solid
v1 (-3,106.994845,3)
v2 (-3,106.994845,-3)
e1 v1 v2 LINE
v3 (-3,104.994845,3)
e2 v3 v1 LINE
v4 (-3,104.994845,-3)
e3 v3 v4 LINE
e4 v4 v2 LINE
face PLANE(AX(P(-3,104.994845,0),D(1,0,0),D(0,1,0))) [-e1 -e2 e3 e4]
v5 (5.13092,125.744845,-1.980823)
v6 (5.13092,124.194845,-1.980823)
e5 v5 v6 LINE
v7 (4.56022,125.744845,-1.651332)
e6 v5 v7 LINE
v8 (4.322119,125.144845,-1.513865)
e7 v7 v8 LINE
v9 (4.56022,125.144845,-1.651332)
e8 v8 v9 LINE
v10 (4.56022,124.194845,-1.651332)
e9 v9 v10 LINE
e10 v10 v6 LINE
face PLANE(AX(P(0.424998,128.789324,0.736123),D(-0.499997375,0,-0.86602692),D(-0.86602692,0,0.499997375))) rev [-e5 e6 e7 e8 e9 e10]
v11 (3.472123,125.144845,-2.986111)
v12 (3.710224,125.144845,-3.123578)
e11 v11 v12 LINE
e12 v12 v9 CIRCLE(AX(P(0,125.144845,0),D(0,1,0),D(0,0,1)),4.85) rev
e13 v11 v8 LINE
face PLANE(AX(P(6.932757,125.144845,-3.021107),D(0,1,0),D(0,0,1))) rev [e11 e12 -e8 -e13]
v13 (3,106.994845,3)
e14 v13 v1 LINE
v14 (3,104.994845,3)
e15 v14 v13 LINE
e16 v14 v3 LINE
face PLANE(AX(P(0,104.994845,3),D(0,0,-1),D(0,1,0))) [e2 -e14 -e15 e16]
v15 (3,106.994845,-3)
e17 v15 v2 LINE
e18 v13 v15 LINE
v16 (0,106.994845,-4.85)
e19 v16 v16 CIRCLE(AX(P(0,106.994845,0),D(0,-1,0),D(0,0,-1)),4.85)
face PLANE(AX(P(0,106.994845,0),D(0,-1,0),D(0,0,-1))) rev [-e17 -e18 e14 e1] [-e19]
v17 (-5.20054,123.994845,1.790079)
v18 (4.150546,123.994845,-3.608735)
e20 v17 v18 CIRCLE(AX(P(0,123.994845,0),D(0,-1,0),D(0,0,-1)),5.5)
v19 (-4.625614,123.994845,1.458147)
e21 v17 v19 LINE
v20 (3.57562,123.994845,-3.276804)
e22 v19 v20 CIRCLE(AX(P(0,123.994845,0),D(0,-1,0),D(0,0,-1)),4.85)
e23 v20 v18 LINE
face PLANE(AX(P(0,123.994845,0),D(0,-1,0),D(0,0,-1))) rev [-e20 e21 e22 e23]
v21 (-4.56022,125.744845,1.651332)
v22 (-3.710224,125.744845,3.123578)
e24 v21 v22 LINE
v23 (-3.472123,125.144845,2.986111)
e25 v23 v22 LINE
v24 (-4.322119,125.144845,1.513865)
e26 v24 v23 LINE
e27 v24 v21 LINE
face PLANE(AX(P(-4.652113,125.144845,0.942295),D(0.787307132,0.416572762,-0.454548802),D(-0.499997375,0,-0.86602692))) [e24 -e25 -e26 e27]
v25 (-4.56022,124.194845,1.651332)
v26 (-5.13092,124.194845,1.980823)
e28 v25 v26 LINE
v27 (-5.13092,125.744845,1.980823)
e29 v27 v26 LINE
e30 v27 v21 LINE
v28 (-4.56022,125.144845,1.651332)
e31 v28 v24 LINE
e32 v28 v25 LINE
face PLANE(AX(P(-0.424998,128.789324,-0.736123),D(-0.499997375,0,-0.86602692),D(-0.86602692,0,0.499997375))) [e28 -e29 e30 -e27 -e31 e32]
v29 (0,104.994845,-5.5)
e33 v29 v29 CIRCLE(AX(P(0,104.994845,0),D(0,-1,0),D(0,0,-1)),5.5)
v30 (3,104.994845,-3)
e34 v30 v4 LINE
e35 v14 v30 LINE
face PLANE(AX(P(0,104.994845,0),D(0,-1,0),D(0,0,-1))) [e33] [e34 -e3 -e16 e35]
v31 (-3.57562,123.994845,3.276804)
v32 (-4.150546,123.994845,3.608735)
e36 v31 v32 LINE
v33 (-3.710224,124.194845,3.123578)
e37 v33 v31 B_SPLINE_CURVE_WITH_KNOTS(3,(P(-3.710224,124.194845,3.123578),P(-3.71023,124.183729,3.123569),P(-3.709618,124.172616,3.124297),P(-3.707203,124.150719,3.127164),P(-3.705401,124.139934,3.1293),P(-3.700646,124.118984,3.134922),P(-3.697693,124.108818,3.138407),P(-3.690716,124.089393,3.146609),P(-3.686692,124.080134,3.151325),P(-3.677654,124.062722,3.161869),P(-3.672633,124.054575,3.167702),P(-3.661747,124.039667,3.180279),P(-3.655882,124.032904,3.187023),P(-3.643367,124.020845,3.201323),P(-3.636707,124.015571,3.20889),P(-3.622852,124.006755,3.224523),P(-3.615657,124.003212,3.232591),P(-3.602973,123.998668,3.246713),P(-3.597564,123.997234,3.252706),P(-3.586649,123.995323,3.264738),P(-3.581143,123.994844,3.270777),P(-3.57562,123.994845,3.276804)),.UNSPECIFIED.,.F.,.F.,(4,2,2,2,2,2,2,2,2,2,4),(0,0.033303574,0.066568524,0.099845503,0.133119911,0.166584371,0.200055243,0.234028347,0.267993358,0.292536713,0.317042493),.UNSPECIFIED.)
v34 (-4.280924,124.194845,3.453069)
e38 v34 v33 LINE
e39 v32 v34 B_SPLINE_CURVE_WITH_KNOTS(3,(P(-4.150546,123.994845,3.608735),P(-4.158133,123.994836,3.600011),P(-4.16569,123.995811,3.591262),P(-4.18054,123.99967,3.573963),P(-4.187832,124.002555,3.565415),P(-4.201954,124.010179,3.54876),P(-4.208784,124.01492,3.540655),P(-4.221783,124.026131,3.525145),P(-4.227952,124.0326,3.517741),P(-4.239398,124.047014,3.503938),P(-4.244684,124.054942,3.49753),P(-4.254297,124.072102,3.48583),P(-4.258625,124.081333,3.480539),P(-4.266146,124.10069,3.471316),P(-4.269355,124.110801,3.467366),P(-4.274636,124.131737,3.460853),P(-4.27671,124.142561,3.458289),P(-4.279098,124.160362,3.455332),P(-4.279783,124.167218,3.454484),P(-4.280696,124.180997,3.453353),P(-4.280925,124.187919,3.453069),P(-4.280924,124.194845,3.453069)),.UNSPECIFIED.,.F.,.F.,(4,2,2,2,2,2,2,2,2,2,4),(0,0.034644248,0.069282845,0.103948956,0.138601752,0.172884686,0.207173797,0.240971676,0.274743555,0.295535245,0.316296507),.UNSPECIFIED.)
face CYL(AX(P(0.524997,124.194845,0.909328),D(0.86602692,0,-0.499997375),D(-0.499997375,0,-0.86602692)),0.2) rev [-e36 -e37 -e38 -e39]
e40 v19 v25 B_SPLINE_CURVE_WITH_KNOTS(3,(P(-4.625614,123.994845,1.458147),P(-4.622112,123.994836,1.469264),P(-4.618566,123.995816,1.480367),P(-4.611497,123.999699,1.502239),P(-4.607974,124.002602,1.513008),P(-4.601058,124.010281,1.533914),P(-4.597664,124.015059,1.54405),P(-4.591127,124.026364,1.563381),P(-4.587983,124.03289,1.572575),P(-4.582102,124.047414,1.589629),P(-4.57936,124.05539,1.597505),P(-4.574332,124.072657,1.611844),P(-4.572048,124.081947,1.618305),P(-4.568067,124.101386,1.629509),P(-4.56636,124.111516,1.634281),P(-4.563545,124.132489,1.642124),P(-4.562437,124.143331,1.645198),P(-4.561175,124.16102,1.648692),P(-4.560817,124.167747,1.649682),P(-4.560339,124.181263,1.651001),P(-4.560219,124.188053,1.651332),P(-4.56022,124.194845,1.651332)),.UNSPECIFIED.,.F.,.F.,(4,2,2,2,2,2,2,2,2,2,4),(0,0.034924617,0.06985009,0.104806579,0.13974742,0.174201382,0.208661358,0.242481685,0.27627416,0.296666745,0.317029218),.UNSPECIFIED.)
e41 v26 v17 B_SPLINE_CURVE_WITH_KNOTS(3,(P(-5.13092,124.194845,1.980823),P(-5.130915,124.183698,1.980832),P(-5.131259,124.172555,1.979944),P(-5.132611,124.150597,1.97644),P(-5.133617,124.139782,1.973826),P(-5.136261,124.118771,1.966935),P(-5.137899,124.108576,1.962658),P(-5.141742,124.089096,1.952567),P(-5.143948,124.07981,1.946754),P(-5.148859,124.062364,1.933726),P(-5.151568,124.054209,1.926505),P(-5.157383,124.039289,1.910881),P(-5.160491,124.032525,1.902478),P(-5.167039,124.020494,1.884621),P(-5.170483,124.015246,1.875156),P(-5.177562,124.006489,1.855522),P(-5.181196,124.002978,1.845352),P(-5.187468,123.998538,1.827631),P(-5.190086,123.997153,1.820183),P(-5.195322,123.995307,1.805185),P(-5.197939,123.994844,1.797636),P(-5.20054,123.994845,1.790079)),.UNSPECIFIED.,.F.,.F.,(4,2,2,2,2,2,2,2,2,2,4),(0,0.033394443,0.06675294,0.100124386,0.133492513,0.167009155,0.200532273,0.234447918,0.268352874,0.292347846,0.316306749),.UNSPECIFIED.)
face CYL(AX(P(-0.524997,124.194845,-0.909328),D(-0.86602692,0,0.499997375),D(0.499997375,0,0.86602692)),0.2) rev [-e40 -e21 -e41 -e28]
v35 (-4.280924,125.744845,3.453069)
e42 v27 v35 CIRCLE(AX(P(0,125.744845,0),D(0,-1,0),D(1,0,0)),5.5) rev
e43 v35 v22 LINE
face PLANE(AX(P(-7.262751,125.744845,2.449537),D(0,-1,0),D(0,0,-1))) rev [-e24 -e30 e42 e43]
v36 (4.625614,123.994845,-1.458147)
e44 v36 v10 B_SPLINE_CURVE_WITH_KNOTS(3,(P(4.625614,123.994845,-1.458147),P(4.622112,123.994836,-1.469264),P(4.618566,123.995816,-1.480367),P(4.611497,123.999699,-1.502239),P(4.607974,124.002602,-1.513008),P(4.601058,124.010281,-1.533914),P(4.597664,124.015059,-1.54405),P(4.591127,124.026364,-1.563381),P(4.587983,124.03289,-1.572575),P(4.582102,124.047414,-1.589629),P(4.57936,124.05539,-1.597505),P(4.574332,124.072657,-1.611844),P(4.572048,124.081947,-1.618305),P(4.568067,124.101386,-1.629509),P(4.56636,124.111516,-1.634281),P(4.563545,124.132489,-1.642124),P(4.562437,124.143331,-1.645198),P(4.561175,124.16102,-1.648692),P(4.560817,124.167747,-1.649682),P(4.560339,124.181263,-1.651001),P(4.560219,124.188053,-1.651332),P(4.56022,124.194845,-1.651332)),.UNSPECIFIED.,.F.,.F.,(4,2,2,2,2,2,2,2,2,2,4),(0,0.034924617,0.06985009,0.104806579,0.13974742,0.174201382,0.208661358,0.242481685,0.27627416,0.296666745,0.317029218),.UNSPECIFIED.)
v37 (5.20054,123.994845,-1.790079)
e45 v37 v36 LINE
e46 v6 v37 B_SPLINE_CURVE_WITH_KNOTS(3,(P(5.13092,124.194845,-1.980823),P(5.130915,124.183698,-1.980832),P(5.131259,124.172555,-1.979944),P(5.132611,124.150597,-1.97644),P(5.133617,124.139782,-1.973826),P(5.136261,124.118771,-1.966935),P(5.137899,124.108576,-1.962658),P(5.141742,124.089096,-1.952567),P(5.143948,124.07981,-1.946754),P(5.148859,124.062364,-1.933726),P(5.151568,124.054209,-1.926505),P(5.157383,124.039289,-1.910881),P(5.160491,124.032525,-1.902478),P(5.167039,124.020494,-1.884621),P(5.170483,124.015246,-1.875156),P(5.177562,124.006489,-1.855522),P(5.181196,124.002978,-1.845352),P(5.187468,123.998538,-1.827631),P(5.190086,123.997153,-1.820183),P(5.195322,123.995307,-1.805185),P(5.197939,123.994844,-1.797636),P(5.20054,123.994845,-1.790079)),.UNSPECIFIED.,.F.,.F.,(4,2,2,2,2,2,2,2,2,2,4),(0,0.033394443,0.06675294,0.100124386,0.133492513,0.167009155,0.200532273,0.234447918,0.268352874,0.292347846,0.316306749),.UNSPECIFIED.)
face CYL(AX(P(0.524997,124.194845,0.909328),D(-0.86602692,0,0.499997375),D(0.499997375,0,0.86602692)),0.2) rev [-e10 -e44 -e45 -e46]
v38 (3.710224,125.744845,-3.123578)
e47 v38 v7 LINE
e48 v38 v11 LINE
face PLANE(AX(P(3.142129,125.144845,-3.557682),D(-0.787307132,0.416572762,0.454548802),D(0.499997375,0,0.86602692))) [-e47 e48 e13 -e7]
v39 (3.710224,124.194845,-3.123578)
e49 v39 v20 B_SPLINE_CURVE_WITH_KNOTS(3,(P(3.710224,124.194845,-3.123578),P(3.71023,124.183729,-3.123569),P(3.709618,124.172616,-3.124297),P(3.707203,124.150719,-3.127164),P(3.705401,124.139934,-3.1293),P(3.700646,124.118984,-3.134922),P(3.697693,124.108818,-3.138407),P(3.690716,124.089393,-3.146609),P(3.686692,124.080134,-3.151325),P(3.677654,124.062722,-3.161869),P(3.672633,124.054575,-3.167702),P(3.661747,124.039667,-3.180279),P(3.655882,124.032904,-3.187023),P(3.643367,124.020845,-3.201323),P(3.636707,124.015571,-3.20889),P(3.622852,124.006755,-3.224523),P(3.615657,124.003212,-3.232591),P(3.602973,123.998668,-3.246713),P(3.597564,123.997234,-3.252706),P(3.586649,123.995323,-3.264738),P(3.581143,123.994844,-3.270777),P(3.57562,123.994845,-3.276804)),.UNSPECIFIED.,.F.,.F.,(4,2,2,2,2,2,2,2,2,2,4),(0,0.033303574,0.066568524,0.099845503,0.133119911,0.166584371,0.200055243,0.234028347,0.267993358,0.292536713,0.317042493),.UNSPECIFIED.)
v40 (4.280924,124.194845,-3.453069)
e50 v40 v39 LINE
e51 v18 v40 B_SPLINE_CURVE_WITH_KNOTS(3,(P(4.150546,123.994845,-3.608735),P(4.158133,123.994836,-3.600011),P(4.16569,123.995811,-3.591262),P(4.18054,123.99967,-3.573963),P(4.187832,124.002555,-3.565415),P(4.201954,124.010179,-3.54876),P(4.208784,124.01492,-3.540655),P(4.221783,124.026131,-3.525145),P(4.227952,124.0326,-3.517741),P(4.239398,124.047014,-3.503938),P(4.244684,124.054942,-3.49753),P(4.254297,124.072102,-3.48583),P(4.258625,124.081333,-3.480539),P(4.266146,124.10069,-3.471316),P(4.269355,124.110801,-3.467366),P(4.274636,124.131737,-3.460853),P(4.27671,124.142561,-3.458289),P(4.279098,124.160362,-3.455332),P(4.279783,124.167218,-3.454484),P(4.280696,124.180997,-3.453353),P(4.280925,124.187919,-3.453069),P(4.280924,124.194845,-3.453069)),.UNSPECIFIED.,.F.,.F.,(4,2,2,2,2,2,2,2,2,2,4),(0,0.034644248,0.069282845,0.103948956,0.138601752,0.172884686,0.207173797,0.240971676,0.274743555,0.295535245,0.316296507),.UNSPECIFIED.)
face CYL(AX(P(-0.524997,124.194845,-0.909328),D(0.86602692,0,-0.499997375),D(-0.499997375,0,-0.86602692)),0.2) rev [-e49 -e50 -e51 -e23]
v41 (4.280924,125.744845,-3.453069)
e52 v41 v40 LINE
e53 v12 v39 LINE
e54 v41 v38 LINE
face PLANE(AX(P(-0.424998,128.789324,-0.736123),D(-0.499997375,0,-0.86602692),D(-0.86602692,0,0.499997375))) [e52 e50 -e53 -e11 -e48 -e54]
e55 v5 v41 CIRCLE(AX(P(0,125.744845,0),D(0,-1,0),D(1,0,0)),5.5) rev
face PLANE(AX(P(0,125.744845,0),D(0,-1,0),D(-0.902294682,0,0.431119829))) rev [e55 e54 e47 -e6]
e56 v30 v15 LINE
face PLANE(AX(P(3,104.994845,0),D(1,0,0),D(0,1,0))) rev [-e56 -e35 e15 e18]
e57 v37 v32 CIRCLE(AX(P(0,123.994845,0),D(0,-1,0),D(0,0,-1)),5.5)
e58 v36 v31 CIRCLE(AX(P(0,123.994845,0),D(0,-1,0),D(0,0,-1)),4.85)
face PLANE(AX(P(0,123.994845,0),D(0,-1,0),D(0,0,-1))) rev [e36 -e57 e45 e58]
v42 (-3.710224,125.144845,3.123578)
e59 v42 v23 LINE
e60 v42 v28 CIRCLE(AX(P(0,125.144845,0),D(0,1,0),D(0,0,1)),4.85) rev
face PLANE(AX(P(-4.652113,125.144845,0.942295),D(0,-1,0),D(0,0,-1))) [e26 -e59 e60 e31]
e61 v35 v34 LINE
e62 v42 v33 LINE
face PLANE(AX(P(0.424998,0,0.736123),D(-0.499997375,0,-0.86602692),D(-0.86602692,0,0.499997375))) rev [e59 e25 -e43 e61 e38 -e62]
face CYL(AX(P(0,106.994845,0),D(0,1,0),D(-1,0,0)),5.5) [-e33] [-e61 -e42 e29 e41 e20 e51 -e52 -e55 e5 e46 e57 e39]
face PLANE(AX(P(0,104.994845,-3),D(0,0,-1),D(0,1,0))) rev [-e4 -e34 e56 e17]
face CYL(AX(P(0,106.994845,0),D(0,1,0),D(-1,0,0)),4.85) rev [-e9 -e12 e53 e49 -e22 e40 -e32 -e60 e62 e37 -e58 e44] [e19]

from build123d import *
from build123d.topology import SkipClean

# Parameters (mm, degrees)
SKETCH1_R                = 5.5
SKETCH1_R_2              = 4.85
BOSS_EXTRUDE1_DEPTH      = 17
BOSS_EXTRUDE2_START      = -1.75
BOSS_EXTRUDE2_DEPTH      = 1.75
BOSS_EXTRUDE3_DEPTH      = 1.7
BOSS_EXTRUDE3_2_DEPTH    = 1.7
BOSS_EXTRUDE4_REACH      = 128.36
BOSS_EXTRUDE4_END_RADIUS = 4.85
SKETCH3_W                = 1.7
SKETCH3_H                = 0.6
BOSS_EXTRUDE5_START      = -9.624935
SKETCH3_2_W              = 1.7
SKETCH3_2_H              = 0.6
BOSS_EXTRUDE5_DEPTH      = 0.075066
FILLET1_R                = 0.2
BOSS_EXTRUDE6_START      = 17
SKETCH1_4_R              = 5.5
SKETCH1_4_W              = 6
SKETCH1_4_H              = 6
BOSS_EXTRUDE6_DEPTH      = 2


with BuildPart() as part:
    # Sketch1 → Boss-Extrude1 (new body)
    with BuildSketch(Plane.XZ.offset(-123.994845224)):
        with Locations(Location((0, 0, 0), (0, 0, 270))):
            Circle(SKETCH1_R)
        with Locations(Location((0, 0, 0), (0, 0, 270))):
            Circle(SKETCH1_R_2, mode=Mode.SUBTRACT)
    extrude(amount=BOSS_EXTRUDE1_DEPTH)

    # Sketch1<3> → Boss-Extrude2 (add)
    with SkipClean():  # the faces are left unmerged after this step: merging them gives an invalid solid
        with BuildSketch(Plane.XZ.offset(-123.994845224).offset(BOSS_EXTRUDE2_START)):
            with BuildLine():
                ThreePointArc((4.280924301, -3.453069233), (4.763148058, -2.74998556), (5.130919838, -1.98082347))
                Line((5.130919838, -1.98082347), (5.108754465, -1.968026376))
                Line((5.108754465, -1.968026376), (4.625228328, -1.688864385))
                Line((4.625228328, -1.688864385), (4.20023564, -2.424978467))
                Line((4.20023564, -2.424978467), (3.775232792, -3.161110148))
                Line((3.775232792, -3.161110148), (4.258758928, -3.440272139))
                Line((4.258758928, -3.440272139), (4.280924301, -3.453069233))
            make_face()
            with BuildLine():
                Line((-3.775232792, 3.161110148), (-4.258758928, 3.440272139))
                Line((-4.258758928, 3.440272139), (-4.280924301, 3.453069233))
                ThreePointArc((-4.280924301, 3.453069233), (-4.763148058, 2.74998556), (-5.130919838, 1.98082347))
                Line((-5.130919838, 1.98082347), (-5.108754465, 1.968026376))
                Line((-5.108754465, 1.968026376), (-4.625228328, 1.688864385))
                Line((-4.625228328, 1.688864385), (-4.200235262, 2.424979122))
                Line((-4.200235262, 2.424979122), (-3.775232792, 3.161110148))
            make_face()
            with BuildLine():
                Line((4.625228328, -1.688864385), (4.560219632, -1.651331859))
                ThreePointArc((4.560219632, -1.651331859), (4.397274885, -2.046087385), (4.20023564, -2.424978467))
                Line((4.20023564, -2.424978467), (4.625228328, -1.688864385))
            make_face()
            with BuildLine():
                ThreePointArc((4.20023564, -2.424978467), (3.970623818, -2.785075672), (3.710224095, -3.123577623))
                Line((3.710224095, -3.123577623), (3.775232792, -3.161110148))
                Line((3.775232792, -3.161110148), (4.20023564, -2.424978467))
            make_face()
            with BuildLine():
                ThreePointArc((-4.560219632, 1.651331859), (-4.397274725, 2.046087728), (-4.200235262, 2.424979122))
                Line((-4.200235262, 2.424979122), (-4.625228328, 1.688864385))
                Line((-4.625228328, 1.688864385), (-4.560219632, 1.651331859))
            make_face()
            with BuildLine():
                Line((-3.710224095, 3.123577623), (-3.775232792, 3.161110148))
                Line((-3.775232792, 3.161110148), (-4.200235262, 2.424979122))
                ThreePointArc((-4.200235262, 2.424979122), (-3.970623601, 2.785075982), (-3.710224095, 3.123577623))
            make_face()
        extrude(amount=BOSS_EXTRUDE2_DEPTH)



with BuildPart() as body_2:
    # Sketch2 → Boss-Extrude3 (new body)
    with BuildSketch(Plane(origin=(0.424997768, 0, 0.736122882), x_dir=(0.866026919582721, 0, -0.49999737455117027), z_dir=(0.49999737455117027, 0, 0.866026919582721))):
        Polygon((4.5, 125.144845224), (4.774934555, 125.144845224), (4.774934555, 125.744845224), align=None)
    extrude(amount=-BOSS_EXTRUDE3_DEPTH)


with BuildPart() as body_3:
    # Sketch2 → Boss-Extrude3 2 (new body)
    with BuildSketch(Plane(origin=(0.424997768, 0, 0.736122882), x_dir=(0.866026919582721, 0, -0.49999737455117027), z_dir=(0.49999737455117027, 0, 0.866026919582721))):
        Polygon((-4.5, 125.144845224), (-4.774934555, 125.744845224), (-4.774934555, 125.144845224), align=None)
    extrude(amount=-BOSS_EXTRUDE3_2_DEPTH)


with BuildPart() as part_1:
    with SkipClean():  # the faces are left unmerged after this step: merging them gives an invalid solid
        add(part.part)

        add(body_2.part)  # Boss-Extrude4 merges body 2
        # Boss-Extrude4: up to this cylinder (the profile starts inside it)
        boss_extrude4_end = Plane(origin=(0, 125.444845, 0), z_dir=(0, 1, 0)) * Cylinder(BOSS_EXTRUDE4_END_RADIUS, 267.42, mode=Mode.PRIVATE)
        # Sketch3 → Boss-Extrude4 (add, up to the surface)
        with BuildSketch(Plane(origin=(4.135221863, 0, -2.387454741), x_dir=(-0.4999973745511703, 0, -0.866026919582721), z_dir=(0.866026919582721, 0, -0.4999973745511703)), mode=Mode.PRIVATE) as boss_extrude4_sk1:
            with Locations((0, 125.444845224)):
                Rectangle(SKETCH3_W, SKETCH3_H)
        boss_extrude4_tool1 = extrude(boss_extrude4_sk1.sketch, amount=BOSS_EXTRUDE4_REACH, mode=Mode.PRIVATE) & boss_extrude4_end
        add(boss_extrude4_tool1.solids().sort_by_distance((4.135222, 125.444845, -2.387455))[0])


    with SkipClean():  # the faces are left unmerged after this step: merging them gives an invalid solid
        add(body_3.part)  # Boss-Extrude5 merges body 3
        # Sketch3<2> → Boss-Extrude5 (add)
        with BuildSketch(Plane(origin=(4.135221863, 0, -2.387454741), x_dir=(-0.4999973745511703, 0, -0.866026919582721), z_dir=(0.866026919582721, 0, -0.4999973745511703)).offset(BOSS_EXTRUDE5_START)):
            with Locations((0, 125.444845224)):
                Rectangle(SKETCH3_2_W, SKETCH3_2_H)
        extrude(amount=BOSS_EXTRUDE5_DEPTH)

    # Fillet1
    # the kernel refuses this fillet: 0.2 mm, written as the material it adds along each edge
    with BuildSketch(Plane(origin=(-4.713937761, 123.994845224, 3.70306792), x_dir=(0.49999737455195337, 0, 0.866026919582269), z_dir=(0.866026919582269, 0, -0.4999973745519534))) as fillet1_piece_1_section:
        with BuildLine():
            CenterArc((FILLET1_R, -FILLET1_R), FILLET1_R, 90, 90)
            Line((0, -FILLET1_R), (0, 0))
            Line((0, 0), (FILLET1_R, 0))
        make_face()
    fillet1_piece_1 = extrude(amount=1.083921236, mode=Mode.PRIVATE)
    fillet1_piece_1 = fillet1_piece_1 & Plane(origin=(0, 124.040443489, 0), x_dir=(0, 0, -1), z_dir=(0, 1, 0)) * Cylinder(5.5, 3, mode=Mode.PRIVATE)
    add(fillet1_piece_1)
    with BuildSketch(Plane(origin=(4.713937761, 123.994845224, -3.70306792), x_dir=(-0.49999737455261106, 0, -0.8660269195818893), z_dir=(-0.8660269195818893, 0, 0.4999973745526111))) as fillet1_piece_2_section:
        with BuildLine():
            CenterArc((FILLET1_R, -FILLET1_R), FILLET1_R, 90, 90)
            Line((0, -FILLET1_R), (0, 0))
            Line((0, 0), (FILLET1_R, 0))
        make_face()
    fillet1_piece_2 = extrude(amount=1.083921236, mode=Mode.PRIVATE)
    fillet1_piece_2 = fillet1_piece_2 & Plane(origin=(0, 124.040443489, 0), x_dir=(0, 0, -1), z_dir=(0, 1, 0)) * Cylinder(5.5, 3, mode=Mode.PRIVATE)
    add(fillet1_piece_2)
    with BuildSketch(Plane(origin=(-4.625228328, 123.994845224, 1.688864385), x_dir=(-0.49999737454985904, 0, -0.866026919583478), z_dir=(-0.8660269195834781, 0, 0.49999737454985904))) as fillet1_piece_3_section:
        with BuildLine():
            CenterArc((FILLET1_R, -FILLET1_R), FILLET1_R, 90, 90)
            Line((0, -FILLET1_R), (0, 0))
            Line((0, 0), (FILLET1_R, 0))
        make_face()
    fillet1_piece_3 = extrude(amount=1.083921236, mode=Mode.PRIVATE)
    fillet1_piece_3 = fillet1_piece_3 & Plane(origin=(0, 124.040443489, 0), x_dir=(0, 0, -1), z_dir=(0, 1, 0)) * Cylinder(5.5, 3, mode=Mode.PRIVATE)
    add(fillet1_piece_3)
    with BuildSketch(Plane(origin=(4.625228328, 123.994845224, -1.688864385), x_dir=(0.4999973745501742, 0, 0.866026919583296), z_dir=(0.8660269195832961, 0, -0.49999737455017423))) as fillet1_piece_4_section:
        with BuildLine():
            CenterArc((FILLET1_R, -FILLET1_R), FILLET1_R, 90, 90)
            Line((0, -FILLET1_R), (0, 0))
            Line((0, 0), (FILLET1_R, 0))
        make_face()
    fillet1_piece_4 = extrude(amount=1.083921236, mode=Mode.PRIVATE)
    fillet1_piece_4 = fillet1_piece_4 & Plane(origin=(0, 124.040443489, 0), x_dir=(0, 0, -1), z_dir=(0, 1, 0)) * Cylinder(5.5, 3, mode=Mode.PRIVATE)
    add(fillet1_piece_4)
    with BuildSketch(Plane(origin=(4.625228328, 123.994845224, -1.688864385), x_dir=(0.4999973745511805, 0, 0.8660269195827152), z_dir=(-0.8660269195827152, 0, 0.49999737455118054))) as fillet1_piece_5_section:
        with BuildLine():
            CenterArc((FILLET1_R, FILLET1_R), FILLET1_R, 180, 90)
            Line((0, FILLET1_R), (0, 0))
            Line((0, 0), (FILLET1_R, 0))
        make_face()
    fillet1_piece_5 = extrude(amount=0.575065445, mode=Mode.PRIVATE)
    fillet1_piece_5 = fillet1_piece_5 - Plane(origin=(0, 124.037616214, 0), x_dir=(0, 0, -1), z_dir=(0, 1, 0)) * Cylinder(4.85, 2, mode=Mode.PRIVATE)
    add(fillet1_piece_5)
    with BuildSketch(Plane(origin=(-4.625228328, 123.994845224, 1.688864385), x_dir=(-0.49999737455107873, 0, -0.8660269195827739), z_dir=(0.8660269195827739, 0, -0.49999737455107884))) as fillet1_piece_6_section:
        with BuildLine():
            CenterArc((FILLET1_R, FILLET1_R), FILLET1_R, 180, 90)
            Line((0, FILLET1_R), (0, 0))
            Line((0, 0), (FILLET1_R, 0))
        make_face()
    fillet1_piece_6 = extrude(amount=0.575065445, mode=Mode.PRIVATE)
    fillet1_piece_6 = fillet1_piece_6 - Plane(origin=(0, 124.037616214, 0), x_dir=(0, 0, -1), z_dir=(0, 1, 0)) * Cylinder(4.85, 2, mode=Mode.PRIVATE)
    add(fillet1_piece_6)
    with BuildSketch(Plane(origin=(3.277210635, 123.994845224, -2.873578935), x_dir=(-0.49999737455115034, 0, -0.8660269195827325), z_dir=(0.8660269195827326, 0, -0.49999737455115034))) as fillet1_piece_7_section:
        with BuildLine():
            CenterArc((FILLET1_R, FILLET1_R), FILLET1_R, 180, 90)
            Line((0, FILLET1_R), (0, 0))
            Line((0, 0), (FILLET1_R, 0))
        make_face()
    fillet1_piece_7 = extrude(amount=0.575065445, mode=Mode.PRIVATE)
    fillet1_piece_7 = fillet1_piece_7 - Plane(origin=(0, 124.037616214, 0), x_dir=(0, 0, -1), z_dir=(0, 1, 0)) * Cylinder(4.85, 2, mode=Mode.PRIVATE)
    add(fillet1_piece_7)
    with BuildSketch(Plane(origin=(-3.277210635, 123.994845224, 2.873578935), x_dir=(0.4999973745510395, 0, 0.8660269195827964), z_dir=(-0.8660269195827965, 0, 0.49999737455103954))) as fillet1_piece_8_section:
        with BuildLine():
            CenterArc((FILLET1_R, FILLET1_R), FILLET1_R, 180, 90)
            Line((0, FILLET1_R), (0, 0))
            Line((0, 0), (FILLET1_R, 0))
        make_face()
    fillet1_piece_8 = extrude(amount=0.575065445, mode=Mode.PRIVATE)
    fillet1_piece_8 = fillet1_piece_8 - Plane(origin=(0, 124.037616214, 0), x_dir=(0, 0, -1), z_dir=(0, 1, 0)) * Cylinder(4.85, 2, mode=Mode.PRIVATE)
    add(fillet1_piece_8)

    # Sketch1<4> → Boss-Extrude6 (add)
    with BuildSketch(Plane.XZ.offset(-123.994845224).offset(BOSS_EXTRUDE6_START)):
        with Locations(Location((0, 0, 0), (0, 0, 161.006016149))):
            Circle(SKETCH1_4_R)
        Rectangle(SKETCH1_4_W, SKETCH1_4_H, mode=Mode.SUBTRACT)
    extrude(amount=BOSS_EXTRUDE6_DEPTH)


solid = part_1.part
